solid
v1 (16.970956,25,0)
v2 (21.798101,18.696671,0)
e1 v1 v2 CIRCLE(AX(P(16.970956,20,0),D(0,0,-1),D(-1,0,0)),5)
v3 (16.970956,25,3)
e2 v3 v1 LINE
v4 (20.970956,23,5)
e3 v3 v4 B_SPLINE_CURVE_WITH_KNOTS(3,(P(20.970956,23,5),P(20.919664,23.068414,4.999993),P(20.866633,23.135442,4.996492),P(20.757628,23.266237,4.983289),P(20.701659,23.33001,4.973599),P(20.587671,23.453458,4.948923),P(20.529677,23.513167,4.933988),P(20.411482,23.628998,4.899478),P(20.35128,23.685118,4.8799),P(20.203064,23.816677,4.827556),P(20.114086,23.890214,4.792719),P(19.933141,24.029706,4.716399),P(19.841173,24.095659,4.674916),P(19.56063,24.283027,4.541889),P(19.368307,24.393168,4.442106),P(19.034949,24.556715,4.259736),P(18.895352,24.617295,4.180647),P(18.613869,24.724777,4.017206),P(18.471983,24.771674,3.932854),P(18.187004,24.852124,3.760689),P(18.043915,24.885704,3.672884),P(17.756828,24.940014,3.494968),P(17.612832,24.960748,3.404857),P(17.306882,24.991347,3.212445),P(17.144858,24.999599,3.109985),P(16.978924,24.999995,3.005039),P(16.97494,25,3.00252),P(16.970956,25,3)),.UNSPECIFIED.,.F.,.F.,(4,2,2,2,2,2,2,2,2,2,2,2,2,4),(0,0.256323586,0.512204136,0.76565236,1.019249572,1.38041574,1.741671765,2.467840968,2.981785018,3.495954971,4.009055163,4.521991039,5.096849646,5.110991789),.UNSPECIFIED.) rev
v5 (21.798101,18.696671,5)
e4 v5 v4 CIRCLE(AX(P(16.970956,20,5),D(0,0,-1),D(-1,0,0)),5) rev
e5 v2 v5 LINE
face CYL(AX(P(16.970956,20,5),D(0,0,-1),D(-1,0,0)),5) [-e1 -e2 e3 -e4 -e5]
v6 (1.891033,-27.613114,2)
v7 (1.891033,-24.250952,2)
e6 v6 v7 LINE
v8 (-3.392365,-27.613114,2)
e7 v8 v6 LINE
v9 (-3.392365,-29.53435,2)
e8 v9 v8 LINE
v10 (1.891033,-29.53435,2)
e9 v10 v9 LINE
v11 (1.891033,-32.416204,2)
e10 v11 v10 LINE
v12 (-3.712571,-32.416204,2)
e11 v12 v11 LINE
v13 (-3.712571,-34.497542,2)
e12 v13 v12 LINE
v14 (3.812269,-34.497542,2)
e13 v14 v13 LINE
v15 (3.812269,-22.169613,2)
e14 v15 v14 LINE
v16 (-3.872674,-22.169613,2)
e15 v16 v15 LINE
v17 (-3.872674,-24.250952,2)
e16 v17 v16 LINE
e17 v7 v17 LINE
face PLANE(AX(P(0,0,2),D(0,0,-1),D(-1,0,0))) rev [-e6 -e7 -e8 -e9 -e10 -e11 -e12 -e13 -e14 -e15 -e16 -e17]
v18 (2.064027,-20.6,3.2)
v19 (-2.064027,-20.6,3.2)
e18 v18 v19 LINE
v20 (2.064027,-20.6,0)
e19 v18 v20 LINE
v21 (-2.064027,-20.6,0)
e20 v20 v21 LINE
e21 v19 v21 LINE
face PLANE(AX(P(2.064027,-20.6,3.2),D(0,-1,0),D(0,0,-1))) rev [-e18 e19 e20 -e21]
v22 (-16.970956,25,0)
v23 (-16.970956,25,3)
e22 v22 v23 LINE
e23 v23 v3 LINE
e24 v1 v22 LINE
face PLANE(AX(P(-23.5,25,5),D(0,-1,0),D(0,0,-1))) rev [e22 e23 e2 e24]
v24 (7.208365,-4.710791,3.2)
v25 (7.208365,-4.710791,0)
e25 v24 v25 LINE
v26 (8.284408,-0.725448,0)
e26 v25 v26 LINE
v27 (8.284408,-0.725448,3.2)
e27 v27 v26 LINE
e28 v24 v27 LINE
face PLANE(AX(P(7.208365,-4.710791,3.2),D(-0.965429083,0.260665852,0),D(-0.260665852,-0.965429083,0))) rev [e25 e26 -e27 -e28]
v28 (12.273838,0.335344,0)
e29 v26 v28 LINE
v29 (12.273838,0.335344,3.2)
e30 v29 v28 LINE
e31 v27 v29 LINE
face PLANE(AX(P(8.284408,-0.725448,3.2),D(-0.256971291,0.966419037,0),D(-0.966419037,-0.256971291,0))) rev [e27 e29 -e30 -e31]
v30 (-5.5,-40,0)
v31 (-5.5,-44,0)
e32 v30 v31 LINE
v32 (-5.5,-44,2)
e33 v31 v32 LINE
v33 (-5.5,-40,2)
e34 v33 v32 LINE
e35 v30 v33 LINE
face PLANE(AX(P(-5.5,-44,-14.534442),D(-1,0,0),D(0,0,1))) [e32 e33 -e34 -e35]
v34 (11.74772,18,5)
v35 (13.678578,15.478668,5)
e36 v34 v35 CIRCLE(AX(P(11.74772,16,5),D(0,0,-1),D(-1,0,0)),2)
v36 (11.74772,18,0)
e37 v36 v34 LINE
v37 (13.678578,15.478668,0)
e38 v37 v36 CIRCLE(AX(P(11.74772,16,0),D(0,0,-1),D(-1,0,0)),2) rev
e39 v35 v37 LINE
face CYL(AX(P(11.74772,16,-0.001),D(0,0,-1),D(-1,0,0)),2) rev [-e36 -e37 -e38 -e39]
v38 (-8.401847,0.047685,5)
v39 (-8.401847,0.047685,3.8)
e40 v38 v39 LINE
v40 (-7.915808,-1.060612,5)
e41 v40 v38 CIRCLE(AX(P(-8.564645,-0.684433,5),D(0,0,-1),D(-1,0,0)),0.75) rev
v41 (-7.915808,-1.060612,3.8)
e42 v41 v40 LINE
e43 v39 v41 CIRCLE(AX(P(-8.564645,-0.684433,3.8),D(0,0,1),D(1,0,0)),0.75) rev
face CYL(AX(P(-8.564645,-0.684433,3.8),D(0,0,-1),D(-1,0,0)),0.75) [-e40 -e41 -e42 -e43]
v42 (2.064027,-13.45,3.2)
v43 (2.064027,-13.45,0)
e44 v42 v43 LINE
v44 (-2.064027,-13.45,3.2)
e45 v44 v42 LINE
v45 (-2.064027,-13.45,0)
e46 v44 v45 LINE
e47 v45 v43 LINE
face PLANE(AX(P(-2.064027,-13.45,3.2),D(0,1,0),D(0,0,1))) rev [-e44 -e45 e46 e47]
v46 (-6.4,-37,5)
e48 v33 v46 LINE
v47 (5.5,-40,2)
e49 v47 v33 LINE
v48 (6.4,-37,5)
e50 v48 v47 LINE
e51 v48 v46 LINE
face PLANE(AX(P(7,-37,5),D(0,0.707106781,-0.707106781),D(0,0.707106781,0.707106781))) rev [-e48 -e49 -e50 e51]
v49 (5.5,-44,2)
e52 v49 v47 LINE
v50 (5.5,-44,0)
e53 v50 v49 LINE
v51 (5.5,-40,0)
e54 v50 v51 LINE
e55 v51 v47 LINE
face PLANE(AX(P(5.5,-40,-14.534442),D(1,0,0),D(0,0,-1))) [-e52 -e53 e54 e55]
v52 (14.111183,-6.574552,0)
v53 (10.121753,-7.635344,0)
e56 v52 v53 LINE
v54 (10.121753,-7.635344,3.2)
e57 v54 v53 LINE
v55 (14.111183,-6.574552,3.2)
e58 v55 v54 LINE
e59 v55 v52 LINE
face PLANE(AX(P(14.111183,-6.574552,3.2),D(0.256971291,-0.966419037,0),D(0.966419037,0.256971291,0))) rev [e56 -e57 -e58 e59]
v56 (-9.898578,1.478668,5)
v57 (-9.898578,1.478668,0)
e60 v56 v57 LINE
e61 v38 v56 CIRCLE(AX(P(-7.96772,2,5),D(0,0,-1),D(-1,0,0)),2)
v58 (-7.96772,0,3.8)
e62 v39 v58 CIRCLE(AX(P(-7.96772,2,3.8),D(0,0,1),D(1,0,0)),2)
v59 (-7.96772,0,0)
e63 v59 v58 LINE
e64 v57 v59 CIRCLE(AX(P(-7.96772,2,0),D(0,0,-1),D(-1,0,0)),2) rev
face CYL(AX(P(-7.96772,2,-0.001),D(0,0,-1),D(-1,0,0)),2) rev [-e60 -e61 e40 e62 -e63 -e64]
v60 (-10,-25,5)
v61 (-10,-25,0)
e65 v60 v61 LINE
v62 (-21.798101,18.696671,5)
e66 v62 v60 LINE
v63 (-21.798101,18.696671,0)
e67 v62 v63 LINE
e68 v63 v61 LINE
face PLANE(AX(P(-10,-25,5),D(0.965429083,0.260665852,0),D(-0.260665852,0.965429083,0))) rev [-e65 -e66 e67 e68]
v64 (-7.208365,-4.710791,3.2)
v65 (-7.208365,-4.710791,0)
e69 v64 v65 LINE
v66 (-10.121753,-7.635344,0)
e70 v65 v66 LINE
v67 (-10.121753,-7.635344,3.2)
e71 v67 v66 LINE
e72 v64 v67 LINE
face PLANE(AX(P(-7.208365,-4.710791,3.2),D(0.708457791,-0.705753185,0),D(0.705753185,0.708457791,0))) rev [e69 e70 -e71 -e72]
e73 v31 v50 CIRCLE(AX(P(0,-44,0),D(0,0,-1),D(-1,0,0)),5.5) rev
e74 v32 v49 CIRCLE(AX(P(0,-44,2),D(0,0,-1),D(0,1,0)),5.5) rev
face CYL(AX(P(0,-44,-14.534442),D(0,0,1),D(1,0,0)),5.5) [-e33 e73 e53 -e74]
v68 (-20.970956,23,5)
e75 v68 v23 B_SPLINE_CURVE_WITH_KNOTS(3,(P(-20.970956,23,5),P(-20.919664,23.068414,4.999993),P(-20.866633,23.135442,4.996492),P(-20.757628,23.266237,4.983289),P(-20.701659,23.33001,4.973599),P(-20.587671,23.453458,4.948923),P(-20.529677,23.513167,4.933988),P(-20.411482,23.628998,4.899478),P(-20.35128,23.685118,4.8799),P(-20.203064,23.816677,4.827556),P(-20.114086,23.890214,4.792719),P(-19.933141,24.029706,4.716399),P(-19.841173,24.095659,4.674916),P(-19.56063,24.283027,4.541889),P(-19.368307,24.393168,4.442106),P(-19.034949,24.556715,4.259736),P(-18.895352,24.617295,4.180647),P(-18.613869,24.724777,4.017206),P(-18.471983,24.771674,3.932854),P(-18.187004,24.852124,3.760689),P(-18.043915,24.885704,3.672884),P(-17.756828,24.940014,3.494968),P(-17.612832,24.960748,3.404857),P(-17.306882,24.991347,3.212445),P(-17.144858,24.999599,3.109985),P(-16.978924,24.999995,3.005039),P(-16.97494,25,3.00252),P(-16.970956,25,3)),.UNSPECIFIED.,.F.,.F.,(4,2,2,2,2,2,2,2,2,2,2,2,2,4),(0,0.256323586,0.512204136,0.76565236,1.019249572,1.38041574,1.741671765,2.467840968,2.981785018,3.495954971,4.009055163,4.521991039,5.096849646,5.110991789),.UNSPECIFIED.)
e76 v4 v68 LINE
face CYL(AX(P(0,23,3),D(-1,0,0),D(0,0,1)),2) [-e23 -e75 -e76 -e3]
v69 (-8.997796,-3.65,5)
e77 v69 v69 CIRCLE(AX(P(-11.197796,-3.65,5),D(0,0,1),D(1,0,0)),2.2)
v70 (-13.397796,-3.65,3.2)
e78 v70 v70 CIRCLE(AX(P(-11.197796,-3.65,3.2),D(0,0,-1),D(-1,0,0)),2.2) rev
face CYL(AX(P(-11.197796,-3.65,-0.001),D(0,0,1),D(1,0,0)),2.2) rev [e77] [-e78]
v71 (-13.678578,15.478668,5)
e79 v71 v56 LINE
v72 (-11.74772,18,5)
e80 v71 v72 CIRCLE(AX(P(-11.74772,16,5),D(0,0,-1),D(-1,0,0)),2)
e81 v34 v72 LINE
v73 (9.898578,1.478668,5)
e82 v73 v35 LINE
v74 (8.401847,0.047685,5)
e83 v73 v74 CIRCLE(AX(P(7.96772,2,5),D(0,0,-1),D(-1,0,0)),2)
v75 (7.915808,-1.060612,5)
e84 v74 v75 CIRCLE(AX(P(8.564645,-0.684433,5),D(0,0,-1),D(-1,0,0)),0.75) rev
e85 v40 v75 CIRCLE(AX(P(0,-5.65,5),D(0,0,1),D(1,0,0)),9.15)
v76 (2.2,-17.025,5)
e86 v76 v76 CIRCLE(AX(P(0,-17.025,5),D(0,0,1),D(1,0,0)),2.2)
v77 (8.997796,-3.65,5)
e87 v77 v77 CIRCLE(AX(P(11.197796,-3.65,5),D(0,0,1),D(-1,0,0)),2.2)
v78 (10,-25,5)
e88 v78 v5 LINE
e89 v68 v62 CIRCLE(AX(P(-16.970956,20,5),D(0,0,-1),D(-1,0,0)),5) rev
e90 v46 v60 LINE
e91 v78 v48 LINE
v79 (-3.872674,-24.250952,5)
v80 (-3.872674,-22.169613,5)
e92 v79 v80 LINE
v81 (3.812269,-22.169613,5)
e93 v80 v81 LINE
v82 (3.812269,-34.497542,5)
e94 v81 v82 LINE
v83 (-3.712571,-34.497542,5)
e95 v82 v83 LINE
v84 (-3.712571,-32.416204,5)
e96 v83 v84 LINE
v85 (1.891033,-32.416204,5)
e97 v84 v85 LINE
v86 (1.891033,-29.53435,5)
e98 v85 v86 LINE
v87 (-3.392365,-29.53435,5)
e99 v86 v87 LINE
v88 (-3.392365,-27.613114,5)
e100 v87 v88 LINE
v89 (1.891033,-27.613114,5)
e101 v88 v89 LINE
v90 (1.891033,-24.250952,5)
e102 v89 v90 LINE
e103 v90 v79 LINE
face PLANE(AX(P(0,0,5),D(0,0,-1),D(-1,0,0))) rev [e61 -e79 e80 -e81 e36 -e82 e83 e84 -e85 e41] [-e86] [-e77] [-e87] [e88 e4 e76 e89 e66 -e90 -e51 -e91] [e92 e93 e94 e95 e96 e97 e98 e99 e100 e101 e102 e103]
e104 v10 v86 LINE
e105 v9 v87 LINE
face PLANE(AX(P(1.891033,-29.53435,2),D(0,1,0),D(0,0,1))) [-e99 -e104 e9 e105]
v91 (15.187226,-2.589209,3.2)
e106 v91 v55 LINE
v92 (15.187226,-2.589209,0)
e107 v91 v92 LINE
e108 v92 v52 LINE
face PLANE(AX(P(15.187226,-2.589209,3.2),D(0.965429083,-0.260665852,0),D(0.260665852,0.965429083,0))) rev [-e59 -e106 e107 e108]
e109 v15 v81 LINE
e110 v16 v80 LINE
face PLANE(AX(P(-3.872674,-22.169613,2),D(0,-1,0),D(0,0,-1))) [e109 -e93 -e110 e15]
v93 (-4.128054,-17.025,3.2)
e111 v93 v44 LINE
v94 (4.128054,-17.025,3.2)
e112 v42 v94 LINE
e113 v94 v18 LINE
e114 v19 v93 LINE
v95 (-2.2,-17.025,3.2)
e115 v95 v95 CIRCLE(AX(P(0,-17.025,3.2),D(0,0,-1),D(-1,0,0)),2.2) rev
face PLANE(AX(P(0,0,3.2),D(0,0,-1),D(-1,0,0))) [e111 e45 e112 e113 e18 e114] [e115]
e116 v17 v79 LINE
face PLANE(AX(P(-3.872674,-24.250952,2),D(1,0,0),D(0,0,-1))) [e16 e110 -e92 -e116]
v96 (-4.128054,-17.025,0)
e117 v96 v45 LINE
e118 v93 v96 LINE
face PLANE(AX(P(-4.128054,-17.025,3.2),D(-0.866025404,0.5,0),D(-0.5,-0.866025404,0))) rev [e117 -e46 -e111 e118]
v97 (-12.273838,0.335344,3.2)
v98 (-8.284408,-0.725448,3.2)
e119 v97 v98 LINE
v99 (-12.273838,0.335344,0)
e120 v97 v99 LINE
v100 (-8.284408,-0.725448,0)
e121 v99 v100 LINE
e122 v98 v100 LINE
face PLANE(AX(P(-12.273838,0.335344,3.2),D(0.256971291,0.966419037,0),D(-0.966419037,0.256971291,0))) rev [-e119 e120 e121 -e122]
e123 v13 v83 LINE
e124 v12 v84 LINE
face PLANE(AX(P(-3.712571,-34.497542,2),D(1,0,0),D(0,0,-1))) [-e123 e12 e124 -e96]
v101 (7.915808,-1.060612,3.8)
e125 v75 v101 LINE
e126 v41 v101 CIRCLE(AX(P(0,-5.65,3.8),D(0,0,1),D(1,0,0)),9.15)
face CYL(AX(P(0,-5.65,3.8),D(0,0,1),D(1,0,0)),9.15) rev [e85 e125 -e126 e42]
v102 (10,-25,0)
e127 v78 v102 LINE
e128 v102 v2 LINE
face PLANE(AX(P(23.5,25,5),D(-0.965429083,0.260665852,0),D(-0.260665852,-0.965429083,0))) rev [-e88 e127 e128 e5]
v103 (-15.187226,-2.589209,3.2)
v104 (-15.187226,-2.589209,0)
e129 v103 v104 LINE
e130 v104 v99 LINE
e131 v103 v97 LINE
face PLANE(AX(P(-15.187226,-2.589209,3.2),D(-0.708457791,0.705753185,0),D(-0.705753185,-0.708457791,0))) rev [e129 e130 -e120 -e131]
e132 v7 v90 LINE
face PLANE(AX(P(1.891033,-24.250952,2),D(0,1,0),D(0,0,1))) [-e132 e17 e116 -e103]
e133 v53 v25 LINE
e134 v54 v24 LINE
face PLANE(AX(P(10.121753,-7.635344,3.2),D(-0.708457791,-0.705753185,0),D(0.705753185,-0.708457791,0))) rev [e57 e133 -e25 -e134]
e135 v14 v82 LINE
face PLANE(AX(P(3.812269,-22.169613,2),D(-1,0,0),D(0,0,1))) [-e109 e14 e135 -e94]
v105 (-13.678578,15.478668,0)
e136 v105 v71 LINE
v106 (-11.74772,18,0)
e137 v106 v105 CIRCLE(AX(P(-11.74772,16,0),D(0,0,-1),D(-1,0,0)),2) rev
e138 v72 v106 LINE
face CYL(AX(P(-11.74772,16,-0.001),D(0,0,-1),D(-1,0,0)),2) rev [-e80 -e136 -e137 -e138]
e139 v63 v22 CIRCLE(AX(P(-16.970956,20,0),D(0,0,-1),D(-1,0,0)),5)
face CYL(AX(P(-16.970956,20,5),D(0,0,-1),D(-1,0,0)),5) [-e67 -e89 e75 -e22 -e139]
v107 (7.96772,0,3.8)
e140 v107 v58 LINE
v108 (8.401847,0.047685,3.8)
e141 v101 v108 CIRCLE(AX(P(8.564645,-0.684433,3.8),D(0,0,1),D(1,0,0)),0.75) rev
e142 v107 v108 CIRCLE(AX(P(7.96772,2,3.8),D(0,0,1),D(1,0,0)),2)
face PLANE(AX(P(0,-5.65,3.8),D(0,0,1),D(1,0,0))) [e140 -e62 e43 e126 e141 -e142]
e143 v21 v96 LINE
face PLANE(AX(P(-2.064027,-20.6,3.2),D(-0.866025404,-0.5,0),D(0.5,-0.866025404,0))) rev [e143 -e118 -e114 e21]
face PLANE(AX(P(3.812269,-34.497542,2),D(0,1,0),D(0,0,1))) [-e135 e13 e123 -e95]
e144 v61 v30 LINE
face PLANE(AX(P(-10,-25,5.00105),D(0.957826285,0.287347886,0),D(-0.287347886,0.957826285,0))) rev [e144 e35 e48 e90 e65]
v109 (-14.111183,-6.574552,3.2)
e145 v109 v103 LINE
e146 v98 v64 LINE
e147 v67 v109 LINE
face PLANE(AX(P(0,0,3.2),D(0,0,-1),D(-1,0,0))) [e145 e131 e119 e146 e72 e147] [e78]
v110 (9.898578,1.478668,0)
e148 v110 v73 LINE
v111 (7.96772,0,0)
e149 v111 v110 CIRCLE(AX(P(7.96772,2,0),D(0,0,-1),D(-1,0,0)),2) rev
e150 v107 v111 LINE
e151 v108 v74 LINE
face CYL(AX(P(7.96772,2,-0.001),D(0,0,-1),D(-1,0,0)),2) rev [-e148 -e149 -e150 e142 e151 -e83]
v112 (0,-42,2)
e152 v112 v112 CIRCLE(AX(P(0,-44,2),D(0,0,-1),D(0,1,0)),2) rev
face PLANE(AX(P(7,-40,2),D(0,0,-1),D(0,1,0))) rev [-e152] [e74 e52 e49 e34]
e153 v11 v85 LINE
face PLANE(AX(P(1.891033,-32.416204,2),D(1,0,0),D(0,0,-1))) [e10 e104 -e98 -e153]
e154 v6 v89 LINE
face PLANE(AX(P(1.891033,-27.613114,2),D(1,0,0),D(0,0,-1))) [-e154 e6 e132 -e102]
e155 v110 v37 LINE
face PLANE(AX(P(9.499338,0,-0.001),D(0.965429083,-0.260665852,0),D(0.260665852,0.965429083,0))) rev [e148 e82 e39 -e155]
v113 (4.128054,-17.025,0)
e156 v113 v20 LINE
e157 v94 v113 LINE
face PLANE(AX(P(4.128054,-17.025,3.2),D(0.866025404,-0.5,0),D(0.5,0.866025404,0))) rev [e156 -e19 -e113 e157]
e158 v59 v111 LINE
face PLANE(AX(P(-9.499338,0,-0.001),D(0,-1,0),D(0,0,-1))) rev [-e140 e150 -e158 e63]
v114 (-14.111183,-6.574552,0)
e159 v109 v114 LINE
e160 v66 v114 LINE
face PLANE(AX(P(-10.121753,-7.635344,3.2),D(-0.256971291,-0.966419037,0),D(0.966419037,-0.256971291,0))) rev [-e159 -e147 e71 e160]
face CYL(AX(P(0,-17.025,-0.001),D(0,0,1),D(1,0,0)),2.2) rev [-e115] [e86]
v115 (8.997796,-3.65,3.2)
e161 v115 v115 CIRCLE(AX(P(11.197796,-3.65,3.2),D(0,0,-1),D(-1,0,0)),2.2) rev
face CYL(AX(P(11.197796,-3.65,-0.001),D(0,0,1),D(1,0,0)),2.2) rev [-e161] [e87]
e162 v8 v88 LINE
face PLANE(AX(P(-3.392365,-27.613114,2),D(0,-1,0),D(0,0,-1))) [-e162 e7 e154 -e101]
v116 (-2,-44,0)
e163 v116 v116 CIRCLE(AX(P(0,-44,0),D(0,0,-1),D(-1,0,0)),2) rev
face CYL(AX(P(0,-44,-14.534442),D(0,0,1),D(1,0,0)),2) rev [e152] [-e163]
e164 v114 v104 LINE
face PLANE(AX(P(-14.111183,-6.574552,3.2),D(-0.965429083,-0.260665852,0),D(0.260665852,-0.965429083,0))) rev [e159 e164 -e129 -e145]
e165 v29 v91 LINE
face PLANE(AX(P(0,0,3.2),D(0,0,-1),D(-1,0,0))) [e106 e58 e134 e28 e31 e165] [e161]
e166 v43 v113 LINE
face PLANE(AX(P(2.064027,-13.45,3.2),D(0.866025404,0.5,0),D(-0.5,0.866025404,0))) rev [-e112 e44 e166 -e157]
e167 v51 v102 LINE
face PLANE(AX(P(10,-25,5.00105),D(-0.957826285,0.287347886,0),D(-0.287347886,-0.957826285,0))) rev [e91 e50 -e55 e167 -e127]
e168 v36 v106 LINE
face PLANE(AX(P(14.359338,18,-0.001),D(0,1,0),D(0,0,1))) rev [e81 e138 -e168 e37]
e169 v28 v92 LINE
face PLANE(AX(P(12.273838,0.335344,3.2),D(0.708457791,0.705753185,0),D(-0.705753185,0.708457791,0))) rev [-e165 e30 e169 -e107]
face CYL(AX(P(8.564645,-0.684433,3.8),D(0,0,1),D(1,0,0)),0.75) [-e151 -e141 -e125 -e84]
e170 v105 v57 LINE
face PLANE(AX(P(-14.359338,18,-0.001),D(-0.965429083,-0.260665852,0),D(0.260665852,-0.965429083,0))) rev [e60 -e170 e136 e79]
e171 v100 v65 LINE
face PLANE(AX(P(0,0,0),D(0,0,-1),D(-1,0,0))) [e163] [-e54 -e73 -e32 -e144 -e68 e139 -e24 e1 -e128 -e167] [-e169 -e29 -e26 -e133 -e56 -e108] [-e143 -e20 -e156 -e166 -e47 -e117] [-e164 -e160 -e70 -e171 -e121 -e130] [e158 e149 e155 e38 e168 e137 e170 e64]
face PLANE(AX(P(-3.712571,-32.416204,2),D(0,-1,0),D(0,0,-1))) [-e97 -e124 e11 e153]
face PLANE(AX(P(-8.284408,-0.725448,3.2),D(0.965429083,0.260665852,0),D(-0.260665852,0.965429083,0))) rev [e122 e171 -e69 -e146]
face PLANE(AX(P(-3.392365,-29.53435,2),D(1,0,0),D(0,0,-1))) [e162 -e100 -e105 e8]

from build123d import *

# Parameters (mm, degrees)
BOSS_EXTRUDE1_DEPTH = 5
CUT_EXTRUDE1_REACH  = 36.673
SKETCH5_R           = 9.15
CUT_EXTRUDE3_DEPTH  = 1.2
CUT_EXTRUDE4_REACH  = 36.673
SKETCH6_R           = 2.2
CUT_EXTRUDE5_DEPTH  = 3.2
SKETCH8_W           = 20
SKETCH8_H           = 5
BOSS_EXTRUDE2_DEPTH = 15
SKETCH3_R           = 2
BOSS_EXTRUDE3_DEPTH = 5
CUT_EXTRUDE6_REACH  = 57.023
FILLET2_R           = 2
CUT_EXTRUDE7_DEPTH  = 3
CUT_EXTRUDE8_DEPTH  = 12.5
FILLET3_R           = 5
FILLET4_R           = 2
FILLET5_R           = 0.75


with BuildPart() as part:
    # Sketch1 → Boss-Extrude1 (new body)
    with BuildSketch(Plane.XY):
        Polygon((-23.5, 25), (23.5, 25), (10, -25), (-10, -25), align=None)
    extrude(amount=BOSS_EXTRUDE1_DEPTH)

    # Sketch2 → Cut-Extrude1 (cut, up to next)
    with BuildSketch(Plane.XY.offset(5), mode=Mode.PRIVATE) as cut_extrude1_sk1:
        Polygon((-9.499337961, 0), (9.499337961, 0), (14.359337961, 18), (-14.359337961, 18), align=None)
    cut_extrude1_tool1 = extrude(cut_extrude1_sk1.sketch, amount=-CUT_EXTRUDE1_REACH, mode=Mode.PRIVATE) & part.part
    add(cut_extrude1_tool1.solids().sort_by_distance((0, 9.611098, 5))[0], mode=Mode.SUBTRACT)

    # Sketch5 → Cut-Extrude3 (cut)
    with BuildSketch(Plane.XY.offset(5)):
        with Locations((0, -5.65)):
            Circle(SKETCH5_R)
    extrude(amount=-CUT_EXTRUDE3_DEPTH, mode=Mode.SUBTRACT)

    # Sketch6 → Cut-Extrude4 (cut, up to next)
    with BuildSketch(Plane.XY.offset(5), mode=Mode.PRIVATE) as cut_extrude4_sk1:
        with Locations((-11.197795542, -3.65)):
            Circle(SKETCH6_R)
    cut_extrude4_tool1 = extrude(cut_extrude4_sk1.sketch, amount=-CUT_EXTRUDE4_REACH, mode=Mode.PRIVATE) & part.part
    # Sketch6 → Cut-Extrude4 (cut, up to next)
    with BuildSketch(Plane.XY.offset(5), mode=Mode.PRIVATE) as cut_extrude4_sk2:
        with Locations((0, -17.025)):
            Circle(SKETCH6_R)
    cut_extrude4_tool2 = extrude(cut_extrude4_sk2.sketch, amount=-CUT_EXTRUDE4_REACH, mode=Mode.PRIVATE) & part.part
    # Sketch6 → Cut-Extrude4 (cut, up to next)
    with BuildSketch(Plane.XY.offset(5), mode=Mode.PRIVATE) as cut_extrude4_sk3:
        with Locations(Location((11.197795542, -3.65, 0), (0, 0, 180))):
            Circle(SKETCH6_R)
    cut_extrude4_tool3 = extrude(cut_extrude4_sk3.sketch, amount=-CUT_EXTRUDE4_REACH, mode=Mode.PRIVATE) & part.part
    add(cut_extrude4_tool1.solids().sort_by_distance((-11.197796, -3.65, 5))[0], mode=Mode.SUBTRACT)
    add(cut_extrude4_tool2.solids().sort_by_distance((0, -17.025, 5))[0], mode=Mode.SUBTRACT)
    add(cut_extrude4_tool3.solids().sort_by_distance((11.197796, -3.65, 5))[0], mode=Mode.SUBTRACT)

    # Sketch7 → Cut-Extrude5 (cut)
    with BuildSketch(Plane(origin=(0, 0, 0), x_dir=(-1, 0, 0), z_dir=(0, 0, -1))):
        Polygon((-7.208365159, -4.710791476), (-8.284407984, -0.72544768), (-12.273838367, 0.335343796), (-15.187225925, -2.589208524), (-14.1111831, -6.57455232), (-10.121752717, -7.635343796), align=None)
        Polygon((-4.128054425, -17.025), (-2.064027212, -20.6), (2.064027212, -20.6), (4.128054425, -17.025), (2.064027212, -13.45), (-2.064027212, -13.45), align=None)
        Polygon((10.121752717, -7.635343796), (14.1111831, -6.57455232), (15.187225925, -2.589208524), (12.273838367, 0.335343796), (8.284407984, -0.72544768), (7.208365159, -4.710791476), align=None)
    extrude(amount=-CUT_EXTRUDE5_DEPTH, mode=Mode.SUBTRACT)

    # Sketch8 → Boss-Extrude2 (add)
    with BuildSketch(Plane.XZ.offset(25)):
        with Locations((0, 2.5)):
            Rectangle(SKETCH8_W, SKETCH8_H)
    extrude(amount=BOSS_EXTRUDE2_DEPTH)

    # Sketch3 → Boss-Extrude3 (add)
    with BuildSketch(Plane.XY.offset(5)):
        with BuildLine():
            Line((-5.5, -44), (-5.5, -40))
            Line((-5.5, -40), (5.5, -40))
            Line((5.5, -40), (5.5, -44))
            ThreePointArc((5.5, -44), (0, -49.5), (-5.5, -44))
        make_face()
        with Locations((0, -44)):
            Circle(SKETCH3_R, mode=Mode.SUBTRACT)
    extrude(amount=-BOSS_EXTRUDE3_DEPTH)

    # Sketch9 → Cut-Extrude6 (cut, up to next)
    with BuildSketch(Plane(origin=(0, 0, 0), x_dir=(-1, 0, 0), z_dir=(0, 0, -1)), mode=Mode.PRIVATE) as cut_extrude6_sk1:
        Polygon((-10, -25), (-5.5, -40), (-10, -40), align=None)
    cut_extrude6_tool1 = extrude(cut_extrude6_sk1.sketch, amount=-CUT_EXTRUDE6_REACH, mode=Mode.PRIVATE) & part.part
    # Sketch9 → Cut-Extrude6 (cut, up to next)
    with BuildSketch(Plane(origin=(0, 0, 0), x_dir=(-1, 0, 0), z_dir=(0, 0, -1)), mode=Mode.PRIVATE) as cut_extrude6_sk2:
        Polygon((10, -25), (5.5, -40), (10, -40), align=None)
    cut_extrude6_tool2 = extrude(cut_extrude6_sk2.sketch, amount=-CUT_EXTRUDE6_REACH, mode=Mode.PRIVATE) & part.part
    add(cut_extrude6_tool1.solids().sort_by_distance((8.5, -35, 0))[0], mode=Mode.SUBTRACT)
    add(cut_extrude6_tool2.solids().sort_by_distance((-8.5, -35, 0))[0], mode=Mode.SUBTRACT)

    # Fillet2
    fillet2_edges = [part.edges().sort_by_distance(p)[0] for p in [
        (-9.499337961, 0, 2.5),
        (-14.359337961, 18, 2.5),
        (14.359337961, 18, 2.5),
        (9.499337961, 0, 2.5),
    ]]
    fillet(fillet2_edges, radius=FILLET2_R)

    # Sketch12 → Cut-Extrude7 (cut)
    with BuildSketch(Plane.XY.offset(5)):
        Polygon((3.812269091, -22.169612745), (3.812269091, -34.497542433), (-3.712571108, -34.497542433), (-3.712571108, -32.416203654), (1.891033295, -32.416203654), (1.891033295, -29.534349961), (-3.392365142, -29.534349961), (-3.392365142, -27.613114166), (1.891033295, -27.613114166), (1.891033295, -24.250951523), (-3.872674091, -24.250951523), (-3.872674091, -22.169612745), align=None)
    extrude(amount=-CUT_EXTRUDE7_DEPTH, mode=Mode.SUBTRACT)

    # Sketch13 → Cut-Extrude8 (cut, symmetric)
    with BuildSketch(Plane.ZY.offset(5.5)):
        Polygon((5, -37), (2, -40), (2, -51.866140446), (5, -51.866140446), align=None)
    extrude(amount=CUT_EXTRUDE8_DEPTH, both=True, mode=Mode.SUBTRACT)

    # Fillet3
    fillet3_edges = [part.edges().sort_by_distance(p)[0] for p in [
        (-23.5, 25, 2.5),
        (23.5, 25, 2.5),
    ]]
    fillet(fillet3_edges, radius=FILLET3_R)

    # Fillet4
    # the kernel refuses this fillet: 2 mm, written as the material it takes off along each edge
    with BuildSketch(Plane(origin=(-21.970955687, 25, 5), x_dir=(0, 0, -1), z_dir=(1, 0, 0))) as fillet4_piece_1:
        with BuildLine():
            CenterArc((FILLET4_R, -FILLET4_R), FILLET4_R, 90, 90)
            Line((0, -FILLET4_R), (0, 0))
            Line((0, 0), (FILLET4_R, 0))
        make_face()
    extrude(amount=43.941911373, mode=Mode.SUBTRACT)

    # Fillet5
    # the kernel refuses this fillet: 0.75 mm, written as the material it takes off along each edge
    with BuildSketch(Plane(origin=(-7.197221686, 0, 3.8), x_dir=(-0.999217435066786, 0.03955398157649034, 0), z_dir=(0, 0, 1))) as fillet5_piece_1:
        with BuildLine():
            CenterArc((1.339281213, 0.737984469), FILLET5_R, 152.162782465, 107.567464563)
            Line((0.676072834, 1.088205323), (0.609751996, 1.123227408))
            ThreePointArc((0.609751996, 1.123227408), (0.293398819, 0.571834806), (-0.060779257, 0.043941801))
            Line((-0.060779257, 0.043941801), (0.002966549, -0.074941308))
            ThreePointArc((0.002966549, -0.074941308), (0.772862133, -0.044465022), (1.192197913, -0.073798447))
            Line((1.192197913, -0.073798447), (1.205569122, 0))
        make_face()
    extrude(amount=4.402796923, mode=Mode.SUBTRACT)
    with BuildSketch(Plane(origin=(7.197221686, 0, 3.8), x_dir=(0.999217435066786, 0.039553981576491995, 0), z_dir=(0, 0, 1))) as fillet5_piece_2:
        with BuildLine():
            CenterArc((1.339281213, -0.737984469), FILLET5_R, 100.269752973, 107.567464563)
            Line((0.676072834, -1.088205323), (0.609751996, -1.123227408))
            ThreePointArc((0.609751996, -1.123227408), (0.293398819, -0.571834806), (-0.060779257, -0.043941801))
            Line((-0.060779257, -0.043941801), (0.002966549, 0.074941308))
            ThreePointArc((0.002966549, 0.074941308), (0.772862133, 0.044465022), (1.192197913, 0.073798447))
            Line((1.192197913, 0.073798447), (1.205569122, 0))
        make_face()
    extrude(amount=4.402796923, mode=Mode.SUBTRACT)


solid = part.part
